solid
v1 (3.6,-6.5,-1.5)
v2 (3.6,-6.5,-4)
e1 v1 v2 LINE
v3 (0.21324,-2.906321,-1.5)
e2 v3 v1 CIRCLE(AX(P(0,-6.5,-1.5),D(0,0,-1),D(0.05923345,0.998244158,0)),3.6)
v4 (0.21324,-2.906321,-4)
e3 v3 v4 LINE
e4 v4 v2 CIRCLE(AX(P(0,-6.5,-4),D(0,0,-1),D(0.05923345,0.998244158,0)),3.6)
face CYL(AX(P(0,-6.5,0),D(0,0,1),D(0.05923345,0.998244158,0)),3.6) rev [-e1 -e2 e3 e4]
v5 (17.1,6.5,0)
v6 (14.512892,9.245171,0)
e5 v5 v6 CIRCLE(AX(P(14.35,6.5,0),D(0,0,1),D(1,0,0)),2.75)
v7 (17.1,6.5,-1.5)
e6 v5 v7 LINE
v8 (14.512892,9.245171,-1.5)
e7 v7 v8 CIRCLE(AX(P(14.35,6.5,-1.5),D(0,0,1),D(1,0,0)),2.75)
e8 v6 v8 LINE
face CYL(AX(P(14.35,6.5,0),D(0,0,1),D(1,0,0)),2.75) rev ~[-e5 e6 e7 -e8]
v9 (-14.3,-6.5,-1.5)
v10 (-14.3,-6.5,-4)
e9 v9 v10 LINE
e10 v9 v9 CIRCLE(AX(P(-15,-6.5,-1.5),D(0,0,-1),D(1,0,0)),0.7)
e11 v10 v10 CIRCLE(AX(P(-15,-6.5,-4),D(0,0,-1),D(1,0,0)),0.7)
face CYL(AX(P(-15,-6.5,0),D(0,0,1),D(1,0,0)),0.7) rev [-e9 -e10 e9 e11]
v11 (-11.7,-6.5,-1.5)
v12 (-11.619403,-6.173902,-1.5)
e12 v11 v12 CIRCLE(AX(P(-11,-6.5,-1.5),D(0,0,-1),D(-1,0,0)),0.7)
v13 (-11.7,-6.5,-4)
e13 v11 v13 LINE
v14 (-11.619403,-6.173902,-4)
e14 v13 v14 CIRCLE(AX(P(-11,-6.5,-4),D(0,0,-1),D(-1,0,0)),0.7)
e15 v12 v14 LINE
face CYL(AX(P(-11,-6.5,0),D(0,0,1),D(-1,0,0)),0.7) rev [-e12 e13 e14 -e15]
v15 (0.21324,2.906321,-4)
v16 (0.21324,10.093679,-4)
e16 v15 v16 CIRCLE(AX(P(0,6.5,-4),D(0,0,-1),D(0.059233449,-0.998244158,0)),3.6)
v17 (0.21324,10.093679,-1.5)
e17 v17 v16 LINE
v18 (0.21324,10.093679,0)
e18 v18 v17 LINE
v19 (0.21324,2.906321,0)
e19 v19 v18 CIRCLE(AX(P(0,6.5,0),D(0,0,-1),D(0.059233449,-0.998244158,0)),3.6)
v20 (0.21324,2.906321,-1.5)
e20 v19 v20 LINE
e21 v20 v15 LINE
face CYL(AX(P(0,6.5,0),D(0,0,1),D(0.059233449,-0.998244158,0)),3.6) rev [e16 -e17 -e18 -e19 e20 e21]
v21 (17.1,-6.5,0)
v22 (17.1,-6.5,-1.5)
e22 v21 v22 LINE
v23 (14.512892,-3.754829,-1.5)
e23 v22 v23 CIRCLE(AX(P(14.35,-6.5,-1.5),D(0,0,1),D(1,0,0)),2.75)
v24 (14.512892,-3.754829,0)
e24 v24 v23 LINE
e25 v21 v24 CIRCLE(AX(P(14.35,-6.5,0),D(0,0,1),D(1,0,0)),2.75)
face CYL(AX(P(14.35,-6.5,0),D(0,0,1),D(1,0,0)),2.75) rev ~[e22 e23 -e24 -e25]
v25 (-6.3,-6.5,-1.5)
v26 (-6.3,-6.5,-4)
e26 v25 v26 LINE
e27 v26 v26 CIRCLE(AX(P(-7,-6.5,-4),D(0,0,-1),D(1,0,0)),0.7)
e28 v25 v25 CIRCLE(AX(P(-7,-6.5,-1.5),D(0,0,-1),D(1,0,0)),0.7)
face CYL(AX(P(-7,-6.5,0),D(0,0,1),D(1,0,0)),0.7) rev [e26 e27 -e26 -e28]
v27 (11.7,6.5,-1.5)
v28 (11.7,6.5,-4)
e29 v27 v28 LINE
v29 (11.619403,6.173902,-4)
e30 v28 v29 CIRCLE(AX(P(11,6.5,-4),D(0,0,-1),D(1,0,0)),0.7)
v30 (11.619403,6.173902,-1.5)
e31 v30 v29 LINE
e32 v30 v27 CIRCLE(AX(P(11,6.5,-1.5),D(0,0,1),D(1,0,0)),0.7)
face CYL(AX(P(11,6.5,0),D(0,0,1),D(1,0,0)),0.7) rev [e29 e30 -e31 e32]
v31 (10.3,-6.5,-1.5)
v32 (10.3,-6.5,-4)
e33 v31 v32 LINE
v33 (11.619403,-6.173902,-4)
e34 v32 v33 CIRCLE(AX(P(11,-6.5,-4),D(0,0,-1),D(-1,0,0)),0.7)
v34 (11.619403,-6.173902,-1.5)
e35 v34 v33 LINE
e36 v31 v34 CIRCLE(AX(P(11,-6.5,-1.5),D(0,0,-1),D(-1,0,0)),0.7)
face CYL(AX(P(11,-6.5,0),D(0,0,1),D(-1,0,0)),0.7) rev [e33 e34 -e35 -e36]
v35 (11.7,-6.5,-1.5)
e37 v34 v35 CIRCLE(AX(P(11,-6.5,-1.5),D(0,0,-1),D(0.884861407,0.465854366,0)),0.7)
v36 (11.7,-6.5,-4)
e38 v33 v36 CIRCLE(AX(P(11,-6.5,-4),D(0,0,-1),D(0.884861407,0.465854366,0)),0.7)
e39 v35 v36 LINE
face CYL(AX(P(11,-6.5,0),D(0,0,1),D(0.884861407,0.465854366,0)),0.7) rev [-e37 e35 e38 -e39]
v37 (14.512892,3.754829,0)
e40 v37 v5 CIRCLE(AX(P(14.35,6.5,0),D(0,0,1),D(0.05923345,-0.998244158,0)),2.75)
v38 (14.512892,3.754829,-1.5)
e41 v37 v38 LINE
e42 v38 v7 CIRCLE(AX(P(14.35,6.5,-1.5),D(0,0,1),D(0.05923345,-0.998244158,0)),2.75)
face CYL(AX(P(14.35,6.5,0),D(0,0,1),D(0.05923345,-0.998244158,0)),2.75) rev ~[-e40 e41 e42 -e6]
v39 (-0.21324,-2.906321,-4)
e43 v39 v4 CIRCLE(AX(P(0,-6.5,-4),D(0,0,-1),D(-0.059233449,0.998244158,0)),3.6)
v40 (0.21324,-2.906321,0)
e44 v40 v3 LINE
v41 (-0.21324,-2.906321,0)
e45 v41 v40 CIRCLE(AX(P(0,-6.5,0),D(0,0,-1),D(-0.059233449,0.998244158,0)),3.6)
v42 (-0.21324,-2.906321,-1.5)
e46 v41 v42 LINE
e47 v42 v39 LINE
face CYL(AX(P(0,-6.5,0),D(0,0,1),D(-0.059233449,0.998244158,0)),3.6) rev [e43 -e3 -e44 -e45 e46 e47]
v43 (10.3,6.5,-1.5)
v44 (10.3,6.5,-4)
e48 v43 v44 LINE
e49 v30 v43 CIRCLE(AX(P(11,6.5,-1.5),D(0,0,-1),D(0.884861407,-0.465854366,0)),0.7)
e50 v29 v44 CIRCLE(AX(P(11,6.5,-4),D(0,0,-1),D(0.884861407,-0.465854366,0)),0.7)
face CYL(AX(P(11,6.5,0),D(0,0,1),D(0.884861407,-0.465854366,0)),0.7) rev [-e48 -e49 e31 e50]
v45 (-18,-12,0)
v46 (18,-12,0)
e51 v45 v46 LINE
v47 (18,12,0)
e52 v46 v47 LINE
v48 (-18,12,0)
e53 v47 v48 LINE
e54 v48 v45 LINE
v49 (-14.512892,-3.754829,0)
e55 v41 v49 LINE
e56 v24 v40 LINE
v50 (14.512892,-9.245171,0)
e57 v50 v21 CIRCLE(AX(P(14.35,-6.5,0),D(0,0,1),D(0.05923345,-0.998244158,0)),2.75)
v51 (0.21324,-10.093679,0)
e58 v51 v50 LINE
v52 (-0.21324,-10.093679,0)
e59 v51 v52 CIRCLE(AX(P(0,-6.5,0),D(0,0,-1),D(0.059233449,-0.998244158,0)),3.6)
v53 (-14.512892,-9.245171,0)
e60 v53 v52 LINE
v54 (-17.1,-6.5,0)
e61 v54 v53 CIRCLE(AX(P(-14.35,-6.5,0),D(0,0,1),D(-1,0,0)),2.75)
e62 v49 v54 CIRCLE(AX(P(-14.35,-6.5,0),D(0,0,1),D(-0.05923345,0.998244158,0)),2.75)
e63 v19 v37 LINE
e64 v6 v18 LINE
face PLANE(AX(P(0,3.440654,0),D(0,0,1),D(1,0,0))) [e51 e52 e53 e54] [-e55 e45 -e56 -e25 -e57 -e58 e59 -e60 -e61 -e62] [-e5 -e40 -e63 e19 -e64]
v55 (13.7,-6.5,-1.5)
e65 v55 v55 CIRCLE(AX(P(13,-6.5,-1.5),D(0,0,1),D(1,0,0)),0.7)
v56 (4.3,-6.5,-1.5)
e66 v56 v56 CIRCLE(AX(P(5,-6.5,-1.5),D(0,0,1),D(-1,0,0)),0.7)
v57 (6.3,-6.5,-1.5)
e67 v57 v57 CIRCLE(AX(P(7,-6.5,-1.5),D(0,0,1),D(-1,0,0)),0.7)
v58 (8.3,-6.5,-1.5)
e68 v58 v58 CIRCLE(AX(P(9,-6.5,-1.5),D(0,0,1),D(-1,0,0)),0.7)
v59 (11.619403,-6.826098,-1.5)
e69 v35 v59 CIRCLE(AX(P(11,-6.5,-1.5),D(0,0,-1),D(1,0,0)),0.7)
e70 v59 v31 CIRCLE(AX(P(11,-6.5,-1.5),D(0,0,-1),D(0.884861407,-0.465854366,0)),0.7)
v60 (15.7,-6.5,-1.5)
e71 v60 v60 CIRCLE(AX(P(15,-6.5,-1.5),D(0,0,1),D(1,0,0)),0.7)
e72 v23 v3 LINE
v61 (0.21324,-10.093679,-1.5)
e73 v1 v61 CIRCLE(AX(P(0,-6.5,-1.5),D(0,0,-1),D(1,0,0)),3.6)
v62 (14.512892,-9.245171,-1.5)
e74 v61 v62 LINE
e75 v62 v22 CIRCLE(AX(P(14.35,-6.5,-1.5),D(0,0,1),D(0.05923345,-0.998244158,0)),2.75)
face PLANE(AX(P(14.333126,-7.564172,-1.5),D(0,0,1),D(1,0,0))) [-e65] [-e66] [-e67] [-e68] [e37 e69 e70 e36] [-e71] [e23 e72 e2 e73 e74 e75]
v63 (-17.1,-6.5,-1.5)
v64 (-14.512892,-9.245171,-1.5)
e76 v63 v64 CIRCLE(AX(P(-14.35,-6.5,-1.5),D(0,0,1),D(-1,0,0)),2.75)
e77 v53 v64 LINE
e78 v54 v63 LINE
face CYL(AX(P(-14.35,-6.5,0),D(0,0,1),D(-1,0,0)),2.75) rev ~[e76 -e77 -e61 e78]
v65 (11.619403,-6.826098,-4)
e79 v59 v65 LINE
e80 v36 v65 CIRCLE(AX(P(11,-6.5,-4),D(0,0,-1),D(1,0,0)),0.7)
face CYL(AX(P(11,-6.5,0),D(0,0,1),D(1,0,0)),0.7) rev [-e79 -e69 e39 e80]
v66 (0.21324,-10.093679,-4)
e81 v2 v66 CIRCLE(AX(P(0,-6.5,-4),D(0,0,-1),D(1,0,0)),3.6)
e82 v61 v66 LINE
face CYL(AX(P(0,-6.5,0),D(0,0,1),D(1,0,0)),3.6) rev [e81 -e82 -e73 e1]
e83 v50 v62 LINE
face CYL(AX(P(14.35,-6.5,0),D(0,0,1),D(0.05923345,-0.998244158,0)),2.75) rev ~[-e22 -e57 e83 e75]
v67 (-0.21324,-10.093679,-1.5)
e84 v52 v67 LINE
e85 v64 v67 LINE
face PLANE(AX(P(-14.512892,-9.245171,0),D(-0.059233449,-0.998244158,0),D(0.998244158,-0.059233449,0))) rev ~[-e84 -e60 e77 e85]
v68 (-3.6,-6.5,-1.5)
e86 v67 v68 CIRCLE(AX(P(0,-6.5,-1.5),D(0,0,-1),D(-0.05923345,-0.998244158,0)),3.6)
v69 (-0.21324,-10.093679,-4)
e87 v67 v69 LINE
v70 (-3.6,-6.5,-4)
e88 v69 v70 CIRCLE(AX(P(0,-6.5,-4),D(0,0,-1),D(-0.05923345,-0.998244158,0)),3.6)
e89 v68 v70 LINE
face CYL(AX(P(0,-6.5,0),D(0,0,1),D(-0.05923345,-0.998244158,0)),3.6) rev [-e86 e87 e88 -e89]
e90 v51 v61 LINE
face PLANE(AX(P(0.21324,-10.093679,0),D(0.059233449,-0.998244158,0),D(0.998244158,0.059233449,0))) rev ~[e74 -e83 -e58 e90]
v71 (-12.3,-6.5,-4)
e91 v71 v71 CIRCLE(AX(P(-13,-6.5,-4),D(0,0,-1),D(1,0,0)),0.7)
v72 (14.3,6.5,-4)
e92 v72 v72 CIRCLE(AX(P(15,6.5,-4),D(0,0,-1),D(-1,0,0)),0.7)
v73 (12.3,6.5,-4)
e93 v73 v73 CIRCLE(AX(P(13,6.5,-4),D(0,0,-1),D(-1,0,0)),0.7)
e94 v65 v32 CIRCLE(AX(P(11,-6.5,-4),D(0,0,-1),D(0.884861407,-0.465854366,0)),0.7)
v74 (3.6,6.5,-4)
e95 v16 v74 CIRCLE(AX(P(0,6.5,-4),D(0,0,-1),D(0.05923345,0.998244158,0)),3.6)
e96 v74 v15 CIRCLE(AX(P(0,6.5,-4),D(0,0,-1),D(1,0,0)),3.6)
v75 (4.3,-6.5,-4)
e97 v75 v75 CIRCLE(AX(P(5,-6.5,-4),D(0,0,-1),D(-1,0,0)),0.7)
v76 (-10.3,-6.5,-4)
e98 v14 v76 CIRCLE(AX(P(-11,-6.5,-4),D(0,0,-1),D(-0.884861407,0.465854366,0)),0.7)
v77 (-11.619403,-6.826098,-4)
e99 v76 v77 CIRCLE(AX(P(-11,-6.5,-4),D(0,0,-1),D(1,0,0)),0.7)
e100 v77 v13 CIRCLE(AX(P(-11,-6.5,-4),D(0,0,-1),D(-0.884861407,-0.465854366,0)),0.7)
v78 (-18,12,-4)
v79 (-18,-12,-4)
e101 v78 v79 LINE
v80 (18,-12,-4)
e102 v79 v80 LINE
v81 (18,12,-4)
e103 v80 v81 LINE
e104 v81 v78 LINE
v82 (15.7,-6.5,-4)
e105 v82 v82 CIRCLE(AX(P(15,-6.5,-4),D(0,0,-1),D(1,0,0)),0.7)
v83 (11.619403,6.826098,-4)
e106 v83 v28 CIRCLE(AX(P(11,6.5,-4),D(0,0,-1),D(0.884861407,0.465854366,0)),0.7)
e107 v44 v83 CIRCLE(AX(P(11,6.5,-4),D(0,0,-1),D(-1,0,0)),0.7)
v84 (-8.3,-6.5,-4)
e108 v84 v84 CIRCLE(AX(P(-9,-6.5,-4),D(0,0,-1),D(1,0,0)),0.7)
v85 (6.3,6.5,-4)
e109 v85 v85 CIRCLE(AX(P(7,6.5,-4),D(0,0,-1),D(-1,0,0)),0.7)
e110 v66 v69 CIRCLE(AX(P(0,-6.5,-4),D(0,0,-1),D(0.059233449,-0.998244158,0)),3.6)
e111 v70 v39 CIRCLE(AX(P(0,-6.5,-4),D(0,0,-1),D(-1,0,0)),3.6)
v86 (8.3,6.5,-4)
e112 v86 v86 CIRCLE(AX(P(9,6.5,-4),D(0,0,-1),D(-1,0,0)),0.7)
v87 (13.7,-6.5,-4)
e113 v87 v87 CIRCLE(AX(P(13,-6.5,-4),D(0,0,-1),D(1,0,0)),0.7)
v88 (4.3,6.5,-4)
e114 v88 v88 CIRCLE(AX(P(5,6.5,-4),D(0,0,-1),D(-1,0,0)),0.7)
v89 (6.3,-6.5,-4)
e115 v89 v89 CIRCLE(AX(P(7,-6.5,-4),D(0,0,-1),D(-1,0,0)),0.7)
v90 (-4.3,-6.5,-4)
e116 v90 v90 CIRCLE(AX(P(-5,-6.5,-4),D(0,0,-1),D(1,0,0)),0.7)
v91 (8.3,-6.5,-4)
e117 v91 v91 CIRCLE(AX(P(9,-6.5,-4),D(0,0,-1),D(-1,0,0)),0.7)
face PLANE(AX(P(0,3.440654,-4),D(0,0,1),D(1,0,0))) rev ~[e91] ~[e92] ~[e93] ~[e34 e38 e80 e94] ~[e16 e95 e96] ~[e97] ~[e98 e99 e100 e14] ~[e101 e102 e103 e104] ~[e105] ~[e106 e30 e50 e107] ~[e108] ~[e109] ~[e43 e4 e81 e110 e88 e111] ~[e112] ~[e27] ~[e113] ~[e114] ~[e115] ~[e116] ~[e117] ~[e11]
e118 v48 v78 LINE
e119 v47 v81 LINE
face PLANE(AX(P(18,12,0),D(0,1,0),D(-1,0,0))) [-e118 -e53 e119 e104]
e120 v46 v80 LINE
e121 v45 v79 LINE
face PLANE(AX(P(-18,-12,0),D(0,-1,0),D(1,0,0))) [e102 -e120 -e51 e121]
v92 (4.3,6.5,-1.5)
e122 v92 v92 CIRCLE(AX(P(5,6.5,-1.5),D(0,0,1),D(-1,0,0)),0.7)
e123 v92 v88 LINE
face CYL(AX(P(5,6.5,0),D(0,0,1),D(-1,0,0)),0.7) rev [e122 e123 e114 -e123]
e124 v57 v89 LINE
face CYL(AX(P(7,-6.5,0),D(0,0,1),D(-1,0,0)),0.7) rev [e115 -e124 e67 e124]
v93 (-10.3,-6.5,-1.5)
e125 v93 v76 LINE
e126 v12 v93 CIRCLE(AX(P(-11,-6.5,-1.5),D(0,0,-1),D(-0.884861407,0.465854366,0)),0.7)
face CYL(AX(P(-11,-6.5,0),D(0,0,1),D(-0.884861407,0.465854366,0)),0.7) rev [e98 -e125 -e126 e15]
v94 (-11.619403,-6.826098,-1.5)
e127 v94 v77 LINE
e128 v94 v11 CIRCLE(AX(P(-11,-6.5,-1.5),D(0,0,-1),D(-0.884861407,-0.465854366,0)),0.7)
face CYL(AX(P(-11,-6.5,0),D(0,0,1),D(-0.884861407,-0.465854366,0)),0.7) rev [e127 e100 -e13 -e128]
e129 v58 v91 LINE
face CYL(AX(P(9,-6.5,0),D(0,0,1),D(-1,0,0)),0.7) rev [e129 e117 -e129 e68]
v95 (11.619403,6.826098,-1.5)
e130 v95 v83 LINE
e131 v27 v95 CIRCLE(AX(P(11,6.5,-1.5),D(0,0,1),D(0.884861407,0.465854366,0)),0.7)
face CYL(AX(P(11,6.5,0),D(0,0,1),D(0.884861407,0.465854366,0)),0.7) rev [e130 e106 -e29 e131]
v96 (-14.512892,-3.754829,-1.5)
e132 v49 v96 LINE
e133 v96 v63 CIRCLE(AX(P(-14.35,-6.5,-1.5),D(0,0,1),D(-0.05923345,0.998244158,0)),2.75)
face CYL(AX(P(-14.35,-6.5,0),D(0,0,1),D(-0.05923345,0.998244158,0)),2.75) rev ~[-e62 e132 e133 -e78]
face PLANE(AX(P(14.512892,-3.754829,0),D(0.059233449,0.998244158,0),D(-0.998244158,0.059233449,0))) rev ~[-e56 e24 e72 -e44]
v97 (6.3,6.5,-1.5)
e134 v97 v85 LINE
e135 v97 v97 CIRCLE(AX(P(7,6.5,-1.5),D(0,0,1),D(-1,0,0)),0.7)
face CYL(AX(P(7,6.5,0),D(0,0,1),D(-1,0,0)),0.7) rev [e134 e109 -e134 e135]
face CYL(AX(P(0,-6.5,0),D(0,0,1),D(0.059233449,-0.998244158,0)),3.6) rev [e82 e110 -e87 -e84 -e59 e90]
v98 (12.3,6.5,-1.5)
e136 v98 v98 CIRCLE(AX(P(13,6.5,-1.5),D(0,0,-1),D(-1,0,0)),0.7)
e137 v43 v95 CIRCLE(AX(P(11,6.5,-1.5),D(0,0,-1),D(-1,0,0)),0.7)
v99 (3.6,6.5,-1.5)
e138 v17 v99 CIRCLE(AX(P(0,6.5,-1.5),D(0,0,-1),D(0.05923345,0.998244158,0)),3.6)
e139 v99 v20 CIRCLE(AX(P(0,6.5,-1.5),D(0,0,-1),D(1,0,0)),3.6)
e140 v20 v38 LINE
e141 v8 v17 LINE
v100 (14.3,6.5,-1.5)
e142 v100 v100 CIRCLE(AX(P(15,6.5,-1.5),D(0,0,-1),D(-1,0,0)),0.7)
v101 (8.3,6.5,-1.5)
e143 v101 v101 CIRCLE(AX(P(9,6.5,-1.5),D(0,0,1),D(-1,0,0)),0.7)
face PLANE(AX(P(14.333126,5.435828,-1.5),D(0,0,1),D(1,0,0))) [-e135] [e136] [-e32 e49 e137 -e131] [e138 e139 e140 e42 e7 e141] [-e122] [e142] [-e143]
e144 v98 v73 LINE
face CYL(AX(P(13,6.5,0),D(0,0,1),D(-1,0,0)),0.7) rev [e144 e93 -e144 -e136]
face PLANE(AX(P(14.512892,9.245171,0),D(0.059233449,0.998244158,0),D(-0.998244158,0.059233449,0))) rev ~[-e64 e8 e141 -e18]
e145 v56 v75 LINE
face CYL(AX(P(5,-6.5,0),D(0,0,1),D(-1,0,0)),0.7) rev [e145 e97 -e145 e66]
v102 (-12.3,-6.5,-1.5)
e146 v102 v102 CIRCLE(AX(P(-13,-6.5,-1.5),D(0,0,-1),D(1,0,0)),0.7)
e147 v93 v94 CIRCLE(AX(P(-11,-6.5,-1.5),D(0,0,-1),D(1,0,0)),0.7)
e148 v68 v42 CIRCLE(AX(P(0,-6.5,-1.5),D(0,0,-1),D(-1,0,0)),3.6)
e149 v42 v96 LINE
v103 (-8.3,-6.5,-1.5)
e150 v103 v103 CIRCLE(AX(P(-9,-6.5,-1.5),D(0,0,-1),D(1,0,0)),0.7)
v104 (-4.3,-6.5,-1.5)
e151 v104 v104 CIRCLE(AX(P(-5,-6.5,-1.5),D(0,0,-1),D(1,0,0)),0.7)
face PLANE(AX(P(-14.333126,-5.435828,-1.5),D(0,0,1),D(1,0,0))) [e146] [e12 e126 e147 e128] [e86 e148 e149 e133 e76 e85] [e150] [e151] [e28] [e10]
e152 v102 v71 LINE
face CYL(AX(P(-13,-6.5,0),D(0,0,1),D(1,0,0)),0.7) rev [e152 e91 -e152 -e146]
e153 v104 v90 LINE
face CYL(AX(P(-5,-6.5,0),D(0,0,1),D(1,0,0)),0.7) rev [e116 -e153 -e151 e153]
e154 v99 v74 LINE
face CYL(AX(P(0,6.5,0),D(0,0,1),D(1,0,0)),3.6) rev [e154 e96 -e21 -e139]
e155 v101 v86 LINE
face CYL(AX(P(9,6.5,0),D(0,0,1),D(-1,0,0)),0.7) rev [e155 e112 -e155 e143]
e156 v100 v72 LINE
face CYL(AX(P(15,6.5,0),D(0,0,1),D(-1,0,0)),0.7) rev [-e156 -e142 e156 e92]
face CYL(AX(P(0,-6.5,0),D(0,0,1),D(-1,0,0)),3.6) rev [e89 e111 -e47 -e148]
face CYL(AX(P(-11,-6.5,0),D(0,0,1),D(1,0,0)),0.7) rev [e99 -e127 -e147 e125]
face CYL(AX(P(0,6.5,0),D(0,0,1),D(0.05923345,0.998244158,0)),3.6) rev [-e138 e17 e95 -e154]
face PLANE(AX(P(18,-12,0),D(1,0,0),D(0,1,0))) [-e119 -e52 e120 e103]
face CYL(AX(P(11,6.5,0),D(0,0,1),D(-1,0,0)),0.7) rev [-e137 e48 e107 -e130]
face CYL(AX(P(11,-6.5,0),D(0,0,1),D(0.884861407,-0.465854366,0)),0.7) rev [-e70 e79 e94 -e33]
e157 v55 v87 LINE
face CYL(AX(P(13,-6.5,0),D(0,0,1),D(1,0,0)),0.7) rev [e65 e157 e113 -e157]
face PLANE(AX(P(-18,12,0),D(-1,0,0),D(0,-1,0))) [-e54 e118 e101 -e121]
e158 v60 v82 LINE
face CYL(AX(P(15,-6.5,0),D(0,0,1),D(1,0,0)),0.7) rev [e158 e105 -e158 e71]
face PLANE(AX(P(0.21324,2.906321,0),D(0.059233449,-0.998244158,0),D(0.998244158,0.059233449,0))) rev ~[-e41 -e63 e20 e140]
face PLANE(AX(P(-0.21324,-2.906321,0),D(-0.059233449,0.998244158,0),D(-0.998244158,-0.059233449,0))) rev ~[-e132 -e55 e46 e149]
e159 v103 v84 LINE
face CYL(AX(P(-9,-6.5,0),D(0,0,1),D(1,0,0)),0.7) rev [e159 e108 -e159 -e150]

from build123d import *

# Parameters (mm, degrees)
F1_DEPTH = 4
F2_DEPTH = 1.5


with BuildPart() as f1:
    # F0 (on Top) → F1 (new body)
    with BuildSketch(Plane.XY):
        with BuildLine():
            Line((18, 12), (-18, 12))
            Line((-18, 12), (-18, -6.5))
            Line((-18, -6.5), (-17.1, -6.5))
            ThreePointArc((-17.1, -6.5), (-16.3513061937, -4.613926428), (-14.5128919861, -3.7548285662))
            Line((-14.5128919861, -3.7548285662), (-0.2132404181, -2.9063210321))
            ThreePointArc((-0.2132404181, -2.9063210321), (0, -2.9), (0.2132404181, -2.9063210321))
            Line((0.2132404181, -2.9063210321), (14.5128919861, -3.7548285662))
            ThreePointArc((14.5128919861, -3.7548285662), (16.3513061937, -4.613926428), (17.1, -6.5))
            Line((17.1, -6.5), (18, -6.5))
            Line((18, -6.5), (18, 6.5))
            Line((18, 6.5), (18, 12))
        make_face()
        with BuildLine():
            ThreePointArc((14.5128919861, 9.2451714338), (16.3513061937, 8.386073572), (17.1, 6.5))
            ThreePointArc((17.1, 6.5), (16.3513061937, 4.613926428), (14.5128919861, 3.7548285662))
            Line((14.5128919861, 3.7548285662), (0.2132404181, 2.9063210321))
            ThreePointArc((0.2132404181, 2.9063210321), (-3.6, 6.5), (0.2132404181, 10.0936789679))
            Line((0.2132404181, 10.0936789679), (14.5128919861, 9.2451714338))
        make_face(mode=Mode.SUBTRACT)
        with BuildLine():
            Line((-17.1, -6.5), (-18, -6.5))
            Line((-18, -6.5), (-18, -12))
            Line((-18, -12), (18, -12))
            Line((18, -12), (18, -6.5))
            Line((18, -6.5), (17.1, -6.5))
            ThreePointArc((17.1, -6.5), (16.3513061937, -8.386073572), (14.5128919861, -9.2451714338))
            Line((14.5128919861, -9.2451714338), (0.2132404181, -10.0936789679))
            ThreePointArc((0.2132404181, -10.0936789679), (0, -10.1), (-0.2132404181, -10.0936789679))
            Line((-0.2132404181, -10.0936789679), (-14.5128919861, -9.2451714338))
            ThreePointArc((-14.5128919861, -9.2451714338), (-16.3513061937, -8.386073572), (-17.1, -6.5))
        make_face()
        with BuildLine():
            ThreePointArc((-14.5128919861, -3.7548285662), (-16.3513061937, -4.613926428), (-17.1, -6.5))
            Line((-17.1, -6.5), (-15.7, -6.5))
            ThreePointArc((-15.7, -6.5), (-15, -5.8), (-14.3, -6.5))
            Line((-14.3, -6.5), (-13.7, -6.5))
            ThreePointArc((-13.7, -6.5), (-13, -5.8), (-12.3, -6.5))
            Line((-12.3, -6.5), (-11.7, -6.5))
            ThreePointArc((-11.7, -6.5), (-11.6795520913, -6.3320447821), (-11.6194029851, -6.1739019441))
            ThreePointArc((-11.6194029851, -6.1739019441), (-12.5861246414, -4.3902029199), (-14.5128919861, -3.7548285662))
        make_face()
        with BuildLine():
            Line((-15.7, -6.5), (-17.1, -6.5))
            ThreePointArc((-17.1, -6.5), (-16.3513061937, -8.386073572), (-14.5128919861, -9.2451714338))
            ThreePointArc((-14.5128919861, -9.2451714338), (-12.5861246414, -8.6097970801), (-11.6194029851, -6.8260980559))
            ThreePointArc((-11.6194029851, -6.8260980559), (-11.6795520913, -6.6679552179), (-11.7, -6.5))
            Line((-11.7, -6.5), (-12.3, -6.5))
            ThreePointArc((-12.3, -6.5), (-13, -7.2), (-13.7, -6.5))
            Line((-13.7, -6.5), (-14.3, -6.5))
            ThreePointArc((-14.3, -6.5), (-15, -7.2), (-15.7, -6.5))
        make_face()
        with BuildLine():
            Line((-0.2132404181, -2.9063210321), (-14.5128919861, -3.7548285662))
            ThreePointArc((-14.5128919861, -3.7548285662), (-12.5861246414, -4.3902029199), (-11.6194029851, -6.1739019441))
            ThreePointArc((-11.6194029851, -6.1739019441), (-10.8320447821, -5.8204479087), (-10.3, -6.5))
            Line((-10.3, -6.5), (-9.7, -6.5))
            ThreePointArc((-9.7, -6.5), (-9, -5.8), (-8.3, -6.5))
            Line((-8.3, -6.5), (-7.7, -6.5))
            ThreePointArc((-7.7, -6.5), (-7, -5.8), (-6.3, -6.5))
            Line((-6.3, -6.5), (-5.7, -6.5))
            ThreePointArc((-5.7, -6.5), (-5, -5.8), (-4.3, -6.5))
            Line((-4.3, -6.5), (-3.6, -6.5))
            ThreePointArc((-3.6, -6.5), (-2.6198917444, -4.030958233), (-0.2132404181, -2.9063210321))
        make_face()
        with BuildLine():
            ThreePointArc((-11.6194029851, -6.8260980559), (-12.5861246414, -8.6097970801), (-14.5128919861, -9.2451714338))
            Line((-14.5128919861, -9.2451714338), (-0.2132404181, -10.0936789679))
            ThreePointArc((-0.2132404181, -10.0936789679), (-2.6198917444, -8.969041767), (-3.6, -6.5))
            Line((-3.6, -6.5), (-4.3, -6.5))
            ThreePointArc((-4.3, -6.5), (-5, -7.2), (-5.7, -6.5))
            Line((-5.7, -6.5), (-6.3, -6.5))
            ThreePointArc((-6.3, -6.5), (-7, -7.2), (-7.7, -6.5))
            Line((-7.7, -6.5), (-8.3, -6.5))
            ThreePointArc((-8.3, -6.5), (-9, -7.2), (-9.7, -6.5))
            Line((-9.7, -6.5), (-10.3, -6.5))
            ThreePointArc((-10.3, -6.5), (-10.8320447821, -7.1795520913), (-11.6194029851, -6.8260980559))
        make_face()
        with BuildLine():
            Line((0.2132404181, -10.0936789679), (14.5128919861, -9.2451714338))
            ThreePointArc((14.5128919861, -9.2451714338), (12.5861246414, -8.6097970801), (11.6194029851, -6.8260980559))
            ThreePointArc((11.6194029851, -6.8260980559), (10.8320447821, -7.1795520913), (10.3, -6.5))
            Line((10.3, -6.5), (9.7, -6.5))
            ThreePointArc((9.7, -6.5), (9, -7.2), (8.3, -6.5))
            Line((8.3, -6.5), (7.7, -6.5))
            ThreePointArc((7.7, -6.5), (7, -7.2), (6.3, -6.5))
            Line((6.3, -6.5), (5.7, -6.5))
            ThreePointArc((5.7, -6.5), (5, -7.2), (4.3, -6.5))
            Line((4.3, -6.5), (3.6, -6.5))
            ThreePointArc((3.6, -6.5), (2.6198917444, -8.969041767), (0.2132404181, -10.0936789679))
        make_face()
        with BuildLine():
            ThreePointArc((11.6194029851, -6.1739019441), (12.5861246414, -4.3902029199), (14.5128919861, -3.7548285662))
            Line((14.5128919861, -3.7548285662), (0.2132404181, -2.9063210321))
            ThreePointArc((0.2132404181, -2.9063210321), (2.6198917444, -4.030958233), (3.6, -6.5))
            Line((3.6, -6.5), (4.3, -6.5))
            ThreePointArc((4.3, -6.5), (5, -5.8), (5.7, -6.5))
            Line((5.7, -6.5), (6.3, -6.5))
            ThreePointArc((6.3, -6.5), (7, -5.8), (7.7, -6.5))
            Line((7.7, -6.5), (8.3, -6.5))
            ThreePointArc((8.3, -6.5), (9, -5.8), (9.7, -6.5))
            Line((9.7, -6.5), (10.3, -6.5))
            ThreePointArc((10.3, -6.5), (10.8320447821, -5.8204479087), (11.6194029851, -6.1739019441))
        make_face()
        with BuildLine():
            Line((0.2132404181, 2.9063210321), (14.5128919861, 3.7548285662))
            ThreePointArc((14.5128919861, 3.7548285662), (12.5861246414, 4.3902029199), (11.6194029851, 6.1739019441))
            ThreePointArc((11.6194029851, 6.1739019441), (10.8320447821, 5.8204479087), (10.3, 6.5))
            Line((10.3, 6.5), (9.7, 6.5))
            ThreePointArc((9.7, 6.5), (9, 5.8), (8.3, 6.5))
            Line((8.3, 6.5), (7.7, 6.5))
            ThreePointArc((7.7, 6.5), (7, 5.8), (6.3, 6.5))
            Line((6.3, 6.5), (5.7, 6.5))
            ThreePointArc((5.7, 6.5), (5, 5.8), (4.3, 6.5))
            Line((4.3, 6.5), (3.6, 6.5))
            ThreePointArc((3.6, 6.5), (2.6198917444, 4.030958233), (0.2132404181, 2.9063210321))
        make_face()
        with BuildLine():
            ThreePointArc((11.6194029851, 6.8260980559), (12.5861246414, 8.6097970801), (14.5128919861, 9.2451714338))
            Line((14.5128919861, 9.2451714338), (0.2132404181, 10.0936789679))
            ThreePointArc((0.2132404181, 10.0936789679), (2.6198917444, 8.969041767), (3.6, 6.5))
            Line((3.6, 6.5), (4.3, 6.5))
            ThreePointArc((4.3, 6.5), (5, 7.2), (5.7, 6.5))
            Line((5.7, 6.5), (6.3, 6.5))
            ThreePointArc((6.3, 6.5), (7, 7.2), (7.7, 6.5))
            Line((7.7, 6.5), (8.3, 6.5))
            ThreePointArc((8.3, 6.5), (9, 7.2), (9.7, 6.5))
            Line((9.7, 6.5), (10.3, 6.5))
            ThreePointArc((10.3, 6.5), (10.8320447821, 7.1795520913), (11.6194029851, 6.8260980559))
        make_face()
        with BuildLine():
            ThreePointArc((14.5128919861, 3.7548285662), (16.3513061937, 4.613926428), (17.1, 6.5))
            Line((17.1, 6.5), (15.7, 6.5))
            ThreePointArc((15.7, 6.5), (15, 5.8), (14.3, 6.5))
            Line((14.3, 6.5), (13.7, 6.5))
            ThreePointArc((13.7, 6.5), (13, 5.8), (12.3, 6.5))
            Line((12.3, 6.5), (11.7, 6.5))
            ThreePointArc((11.7, 6.5), (11.6795520913, 6.3320447821), (11.6194029851, 6.1739019441))
            ThreePointArc((11.6194029851, 6.1739019441), (12.5861246414, 4.3902029199), (14.5128919861, 3.7548285662))
        make_face()
        with BuildLine():
            Line((15.7, 6.5), (17.1, 6.5))
            ThreePointArc((17.1, 6.5), (16.3513061937, 8.386073572), (14.5128919861, 9.2451714338))
            ThreePointArc((14.5128919861, 9.2451714338), (12.5861246414, 8.6097970801), (11.6194029851, 6.8260980559))
            ThreePointArc((11.6194029851, 6.8260980559), (11.6795520913, 6.6679552179), (11.7, 6.5))
            Line((11.7, 6.5), (12.3, 6.5))
            ThreePointArc((12.3, 6.5), (13, 7.2), (13.7, 6.5))
            Line((13.7, 6.5), (14.3, 6.5))
            ThreePointArc((14.3, 6.5), (15, 7.2), (15.7, 6.5))
        make_face()
        with BuildLine():
            Line((15.7, -6.5), (17.1, -6.5))
            ThreePointArc((17.1, -6.5), (16.3513061937, -4.613926428), (14.5128919861, -3.7548285662))
            ThreePointArc((14.5128919861, -3.7548285662), (12.5861246414, -4.3902029199), (11.6194029851, -6.1739019441))
            ThreePointArc((11.6194029851, -6.1739019441), (11.6795520913, -6.3320447821), (11.7, -6.5))
            Line((11.7, -6.5), (12.3, -6.5))
            ThreePointArc((12.3, -6.5), (13, -5.8), (13.7, -6.5))
            Line((13.7, -6.5), (14.3, -6.5))
            ThreePointArc((14.3, -6.5), (15, -5.8), (15.7, -6.5))
        make_face()
        with BuildLine():
            ThreePointArc((14.5128919861, -9.2451714338), (16.3513061937, -8.386073572), (17.1, -6.5))
            Line((17.1, -6.5), (15.7, -6.5))
            ThreePointArc((15.7, -6.5), (15, -7.2), (14.3, -6.5))
            Line((14.3, -6.5), (13.7, -6.5))
            ThreePointArc((13.7, -6.5), (13, -7.2), (12.3, -6.5))
            Line((12.3, -6.5), (11.7, -6.5))
            ThreePointArc((11.7, -6.5), (11.6795520913, -6.6679552179), (11.6194029851, -6.8260980559))
            ThreePointArc((11.6194029851, -6.8260980559), (12.5861246414, -8.6097970801), (14.5128919861, -9.2451714338))
        make_face()
    extrude(amount=-F1_DEPTH)

    # F0 (on Top) → F2 (cut)
    with BuildSketch(Plane.XY):
        with BuildLine():
            ThreePointArc((14.5128919861, 3.7548285662), (16.3513061937, 4.613926428), (17.1, 6.5))
            Line((17.1, 6.5), (15.7, 6.5))
            ThreePointArc((15.7, 6.5), (15, 5.8), (14.3, 6.5))
            Line((14.3, 6.5), (13.7, 6.5))
            ThreePointArc((13.7, 6.5), (13, 5.8), (12.3, 6.5))
            Line((12.3, 6.5), (11.7, 6.5))
            ThreePointArc((11.7, 6.5), (11.6795520913, 6.3320447821), (11.6194029851, 6.1739019441))
            ThreePointArc((11.6194029851, 6.1739019441), (12.5861246414, 4.3902029199), (14.5128919861, 3.7548285662))
        make_face()
        with BuildLine():
            Line((15.7, 6.5), (17.1, 6.5))
            ThreePointArc((17.1, 6.5), (16.3513061937, 8.386073572), (14.5128919861, 9.2451714338))
            ThreePointArc((14.5128919861, 9.2451714338), (12.5861246414, 8.6097970801), (11.6194029851, 6.8260980559))
            ThreePointArc((11.6194029851, 6.8260980559), (11.6795520913, 6.6679552179), (11.7, 6.5))
            Line((11.7, 6.5), (12.3, 6.5))
            ThreePointArc((12.3, 6.5), (13, 7.2), (13.7, 6.5))
            Line((13.7, 6.5), (14.3, 6.5))
            ThreePointArc((14.3, 6.5), (15, 7.2), (15.7, 6.5))
        make_face()
        with BuildLine():
            ThreePointArc((-14.5128919861, -3.7548285662), (-16.3513061937, -4.613926428), (-17.1, -6.5))
            Line((-17.1, -6.5), (-15.7, -6.5))
            ThreePointArc((-15.7, -6.5), (-15, -5.8), (-14.3, -6.5))
            Line((-14.3, -6.5), (-13.7, -6.5))
            ThreePointArc((-13.7, -6.5), (-13, -5.8), (-12.3, -6.5))
            Line((-12.3, -6.5), (-11.7, -6.5))
            ThreePointArc((-11.7, -6.5), (-11.6795520913, -6.3320447821), (-11.6194029851, -6.1739019441))
            ThreePointArc((-11.6194029851, -6.1739019441), (-12.5861246414, -4.3902029199), (-14.5128919861, -3.7548285662))
        make_face()
        with BuildLine():
            Line((-15.7, -6.5), (-17.1, -6.5))
            ThreePointArc((-17.1, -6.5), (-16.3513061937, -8.386073572), (-14.5128919861, -9.2451714338))
            ThreePointArc((-14.5128919861, -9.2451714338), (-12.5861246414, -8.6097970801), (-11.6194029851, -6.8260980559))
            ThreePointArc((-11.6194029851, -6.8260980559), (-11.6795520913, -6.6679552179), (-11.7, -6.5))
            Line((-11.7, -6.5), (-12.3, -6.5))
            ThreePointArc((-12.3, -6.5), (-13, -7.2), (-13.7, -6.5))
            Line((-13.7, -6.5), (-14.3, -6.5))
            ThreePointArc((-14.3, -6.5), (-15, -7.2), (-15.7, -6.5))
        make_face()
        with BuildLine():
            Line((-0.2132404181, -2.9063210321), (-14.5128919861, -3.7548285662))
            ThreePointArc((-14.5128919861, -3.7548285662), (-12.5861246414, -4.3902029199), (-11.6194029851, -6.1739019441))
            ThreePointArc((-11.6194029851, -6.1739019441), (-10.8320447821, -5.8204479087), (-10.3, -6.5))
            Line((-10.3, -6.5), (-9.7, -6.5))
            ThreePointArc((-9.7, -6.5), (-9, -5.8), (-8.3, -6.5))
            Line((-8.3, -6.5), (-7.7, -6.5))
            ThreePointArc((-7.7, -6.5), (-7, -5.8), (-6.3, -6.5))
            Line((-6.3, -6.5), (-5.7, -6.5))
            ThreePointArc((-5.7, -6.5), (-5, -5.8), (-4.3, -6.5))
            Line((-4.3, -6.5), (-3.6, -6.5))
            ThreePointArc((-3.6, -6.5), (-2.6198917444, -4.030958233), (-0.2132404181, -2.9063210321))
        make_face()
        with BuildLine():
            ThreePointArc((-11.6194029851, -6.8260980559), (-12.5861246414, -8.6097970801), (-14.5128919861, -9.2451714338))
            Line((-14.5128919861, -9.2451714338), (-0.2132404181, -10.0936789679))
            ThreePointArc((-0.2132404181, -10.0936789679), (-2.6198917444, -8.969041767), (-3.6, -6.5))
            Line((-3.6, -6.5), (-4.3, -6.5))
            ThreePointArc((-4.3, -6.5), (-5, -7.2), (-5.7, -6.5))
            Line((-5.7, -6.5), (-6.3, -6.5))
            ThreePointArc((-6.3, -6.5), (-7, -7.2), (-7.7, -6.5))
            Line((-7.7, -6.5), (-8.3, -6.5))
            ThreePointArc((-8.3, -6.5), (-9, -7.2), (-9.7, -6.5))
            Line((-9.7, -6.5), (-10.3, -6.5))
            ThreePointArc((-10.3, -6.5), (-10.8320447821, -7.1795520913), (-11.6194029851, -6.8260980559))
        make_face()
        with BuildLine():
            ThreePointArc((14.5128919861, -9.2451714338), (16.3513061937, -8.386073572), (17.1, -6.5))
            Line((17.1, -6.5), (15.7, -6.5))
            ThreePointArc((15.7, -6.5), (15, -7.2), (14.3, -6.5))
            Line((14.3, -6.5), (13.7, -6.5))
            ThreePointArc((13.7, -6.5), (13, -7.2), (12.3, -6.5))
            Line((12.3, -6.5), (11.7, -6.5))
            ThreePointArc((11.7, -6.5), (11.6795520913, -6.6679552179), (11.6194029851, -6.8260980559))
            ThreePointArc((11.6194029851, -6.8260980559), (12.5861246414, -8.6097970801), (14.5128919861, -9.2451714338))
        make_face()
        with BuildLine():
            Line((15.7, -6.5), (17.1, -6.5))
            ThreePointArc((17.1, -6.5), (16.3513061937, -4.613926428), (14.5128919861, -3.7548285662))
            ThreePointArc((14.5128919861, -3.7548285662), (12.5861246414, -4.3902029199), (11.6194029851, -6.1739019441))
            ThreePointArc((11.6194029851, -6.1739019441), (11.6795520913, -6.3320447821), (11.7, -6.5))
            Line((11.7, -6.5), (12.3, -6.5))
            ThreePointArc((12.3, -6.5), (13, -5.8), (13.7, -6.5))
            Line((13.7, -6.5), (14.3, -6.5))
            ThreePointArc((14.3, -6.5), (15, -5.8), (15.7, -6.5))
        make_face()
        with BuildLine():
            ThreePointArc((11.6194029851, 6.8260980559), (12.5861246414, 8.6097970801), (14.5128919861, 9.2451714338))
            Line((14.5128919861, 9.2451714338), (0.2132404181, 10.0936789679))
            ThreePointArc((0.2132404181, 10.0936789679), (2.6198917444, 8.969041767), (3.6, 6.5))
            Line((3.6, 6.5), (4.3, 6.5))
            ThreePointArc((4.3, 6.5), (5, 7.2), (5.7, 6.5))
            Line((5.7, 6.5), (6.3, 6.5))
            ThreePointArc((6.3, 6.5), (7, 7.2), (7.7, 6.5))
            Line((7.7, 6.5), (8.3, 6.5))
            ThreePointArc((8.3, 6.5), (9, 7.2), (9.7, 6.5))
            Line((9.7, 6.5), (10.3, 6.5))
            ThreePointArc((10.3, 6.5), (10.8320447821, 7.1795520913), (11.6194029851, 6.8260980559))
        make_face()
        with BuildLine():
            Line((0.2132404181, 2.9063210321), (14.5128919861, 3.7548285662))
            ThreePointArc((14.5128919861, 3.7548285662), (12.5861246414, 4.3902029199), (11.6194029851, 6.1739019441))
            ThreePointArc((11.6194029851, 6.1739019441), (10.8320447821, 5.8204479087), (10.3, 6.5))
            Line((10.3, 6.5), (9.7, 6.5))
            ThreePointArc((9.7, 6.5), (9, 5.8), (8.3, 6.5))
            Line((8.3, 6.5), (7.7, 6.5))
            ThreePointArc((7.7, 6.5), (7, 5.8), (6.3, 6.5))
            Line((6.3, 6.5), (5.7, 6.5))
            ThreePointArc((5.7, 6.5), (5, 5.8), (4.3, 6.5))
            Line((4.3, 6.5), (3.6, 6.5))
            ThreePointArc((3.6, 6.5), (2.6198917444, 4.030958233), (0.2132404181, 2.9063210321))
        make_face()
        with BuildLine():
            ThreePointArc((11.6194029851, -6.1739019441), (12.5861246414, -4.3902029199), (14.5128919861, -3.7548285662))
            Line((14.5128919861, -3.7548285662), (0.2132404181, -2.9063210321))
            ThreePointArc((0.2132404181, -2.9063210321), (2.6198917444, -4.030958233), (3.6, -6.5))
            Line((3.6, -6.5), (4.3, -6.5))
            ThreePointArc((4.3, -6.5), (5, -5.8), (5.7, -6.5))
            Line((5.7, -6.5), (6.3, -6.5))
            ThreePointArc((6.3, -6.5), (7, -5.8), (7.7, -6.5))
            Line((7.7, -6.5), (8.3, -6.5))
            ThreePointArc((8.3, -6.5), (9, -5.8), (9.7, -6.5))
            Line((9.7, -6.5), (10.3, -6.5))
            ThreePointArc((10.3, -6.5), (10.8320447821, -5.8204479087), (11.6194029851, -6.1739019441))
        make_face()
        with BuildLine():
            Line((0.2132404181, -10.0936789679), (14.5128919861, -9.2451714338))
            ThreePointArc((14.5128919861, -9.2451714338), (12.5861246414, -8.6097970801), (11.6194029851, -6.8260980559))
            ThreePointArc((11.6194029851, -6.8260980559), (10.8320447821, -7.1795520913), (10.3, -6.5))
            Line((10.3, -6.5), (9.7, -6.5))
            ThreePointArc((9.7, -6.5), (9, -7.2), (8.3, -6.5))
            Line((8.3, -6.5), (7.7, -6.5))
            ThreePointArc((7.7, -6.5), (7, -7.2), (6.3, -6.5))
            Line((6.3, -6.5), (5.7, -6.5))
            ThreePointArc((5.7, -6.5), (5, -7.2), (4.3, -6.5))
            Line((4.3, -6.5), (3.6, -6.5))
            ThreePointArc((3.6, -6.5), (2.6198917444, -8.969041767), (0.2132404181, -10.0936789679))
        make_face()
        with BuildLine():
            ThreePointArc((11.7, 6.5), (11.6795520913, 6.6679552179), (11.6194029851, 6.8260980559))
            ThreePointArc((11.6194029851, 6.8260980559), (11.604855032, 6.6633373946), (11.6, 6.5))
            Line((11.6, 6.5), (11.7, 6.5))
        make_face()
        with BuildLine():
            ThreePointArc((11.6, 6.5), (11.604855032, 6.3366626054), (11.6194029851, 6.1739019441))
            ThreePointArc((11.6194029851, 6.1739019441), (11.6795520913, 6.3320447821), (11.7, 6.5))
            Line((11.7, 6.5), (11.6, 6.5))
        make_face()
    extrude(amount=-F2_DEPTH, mode=Mode.SUBTRACT)


solid = f1.part
